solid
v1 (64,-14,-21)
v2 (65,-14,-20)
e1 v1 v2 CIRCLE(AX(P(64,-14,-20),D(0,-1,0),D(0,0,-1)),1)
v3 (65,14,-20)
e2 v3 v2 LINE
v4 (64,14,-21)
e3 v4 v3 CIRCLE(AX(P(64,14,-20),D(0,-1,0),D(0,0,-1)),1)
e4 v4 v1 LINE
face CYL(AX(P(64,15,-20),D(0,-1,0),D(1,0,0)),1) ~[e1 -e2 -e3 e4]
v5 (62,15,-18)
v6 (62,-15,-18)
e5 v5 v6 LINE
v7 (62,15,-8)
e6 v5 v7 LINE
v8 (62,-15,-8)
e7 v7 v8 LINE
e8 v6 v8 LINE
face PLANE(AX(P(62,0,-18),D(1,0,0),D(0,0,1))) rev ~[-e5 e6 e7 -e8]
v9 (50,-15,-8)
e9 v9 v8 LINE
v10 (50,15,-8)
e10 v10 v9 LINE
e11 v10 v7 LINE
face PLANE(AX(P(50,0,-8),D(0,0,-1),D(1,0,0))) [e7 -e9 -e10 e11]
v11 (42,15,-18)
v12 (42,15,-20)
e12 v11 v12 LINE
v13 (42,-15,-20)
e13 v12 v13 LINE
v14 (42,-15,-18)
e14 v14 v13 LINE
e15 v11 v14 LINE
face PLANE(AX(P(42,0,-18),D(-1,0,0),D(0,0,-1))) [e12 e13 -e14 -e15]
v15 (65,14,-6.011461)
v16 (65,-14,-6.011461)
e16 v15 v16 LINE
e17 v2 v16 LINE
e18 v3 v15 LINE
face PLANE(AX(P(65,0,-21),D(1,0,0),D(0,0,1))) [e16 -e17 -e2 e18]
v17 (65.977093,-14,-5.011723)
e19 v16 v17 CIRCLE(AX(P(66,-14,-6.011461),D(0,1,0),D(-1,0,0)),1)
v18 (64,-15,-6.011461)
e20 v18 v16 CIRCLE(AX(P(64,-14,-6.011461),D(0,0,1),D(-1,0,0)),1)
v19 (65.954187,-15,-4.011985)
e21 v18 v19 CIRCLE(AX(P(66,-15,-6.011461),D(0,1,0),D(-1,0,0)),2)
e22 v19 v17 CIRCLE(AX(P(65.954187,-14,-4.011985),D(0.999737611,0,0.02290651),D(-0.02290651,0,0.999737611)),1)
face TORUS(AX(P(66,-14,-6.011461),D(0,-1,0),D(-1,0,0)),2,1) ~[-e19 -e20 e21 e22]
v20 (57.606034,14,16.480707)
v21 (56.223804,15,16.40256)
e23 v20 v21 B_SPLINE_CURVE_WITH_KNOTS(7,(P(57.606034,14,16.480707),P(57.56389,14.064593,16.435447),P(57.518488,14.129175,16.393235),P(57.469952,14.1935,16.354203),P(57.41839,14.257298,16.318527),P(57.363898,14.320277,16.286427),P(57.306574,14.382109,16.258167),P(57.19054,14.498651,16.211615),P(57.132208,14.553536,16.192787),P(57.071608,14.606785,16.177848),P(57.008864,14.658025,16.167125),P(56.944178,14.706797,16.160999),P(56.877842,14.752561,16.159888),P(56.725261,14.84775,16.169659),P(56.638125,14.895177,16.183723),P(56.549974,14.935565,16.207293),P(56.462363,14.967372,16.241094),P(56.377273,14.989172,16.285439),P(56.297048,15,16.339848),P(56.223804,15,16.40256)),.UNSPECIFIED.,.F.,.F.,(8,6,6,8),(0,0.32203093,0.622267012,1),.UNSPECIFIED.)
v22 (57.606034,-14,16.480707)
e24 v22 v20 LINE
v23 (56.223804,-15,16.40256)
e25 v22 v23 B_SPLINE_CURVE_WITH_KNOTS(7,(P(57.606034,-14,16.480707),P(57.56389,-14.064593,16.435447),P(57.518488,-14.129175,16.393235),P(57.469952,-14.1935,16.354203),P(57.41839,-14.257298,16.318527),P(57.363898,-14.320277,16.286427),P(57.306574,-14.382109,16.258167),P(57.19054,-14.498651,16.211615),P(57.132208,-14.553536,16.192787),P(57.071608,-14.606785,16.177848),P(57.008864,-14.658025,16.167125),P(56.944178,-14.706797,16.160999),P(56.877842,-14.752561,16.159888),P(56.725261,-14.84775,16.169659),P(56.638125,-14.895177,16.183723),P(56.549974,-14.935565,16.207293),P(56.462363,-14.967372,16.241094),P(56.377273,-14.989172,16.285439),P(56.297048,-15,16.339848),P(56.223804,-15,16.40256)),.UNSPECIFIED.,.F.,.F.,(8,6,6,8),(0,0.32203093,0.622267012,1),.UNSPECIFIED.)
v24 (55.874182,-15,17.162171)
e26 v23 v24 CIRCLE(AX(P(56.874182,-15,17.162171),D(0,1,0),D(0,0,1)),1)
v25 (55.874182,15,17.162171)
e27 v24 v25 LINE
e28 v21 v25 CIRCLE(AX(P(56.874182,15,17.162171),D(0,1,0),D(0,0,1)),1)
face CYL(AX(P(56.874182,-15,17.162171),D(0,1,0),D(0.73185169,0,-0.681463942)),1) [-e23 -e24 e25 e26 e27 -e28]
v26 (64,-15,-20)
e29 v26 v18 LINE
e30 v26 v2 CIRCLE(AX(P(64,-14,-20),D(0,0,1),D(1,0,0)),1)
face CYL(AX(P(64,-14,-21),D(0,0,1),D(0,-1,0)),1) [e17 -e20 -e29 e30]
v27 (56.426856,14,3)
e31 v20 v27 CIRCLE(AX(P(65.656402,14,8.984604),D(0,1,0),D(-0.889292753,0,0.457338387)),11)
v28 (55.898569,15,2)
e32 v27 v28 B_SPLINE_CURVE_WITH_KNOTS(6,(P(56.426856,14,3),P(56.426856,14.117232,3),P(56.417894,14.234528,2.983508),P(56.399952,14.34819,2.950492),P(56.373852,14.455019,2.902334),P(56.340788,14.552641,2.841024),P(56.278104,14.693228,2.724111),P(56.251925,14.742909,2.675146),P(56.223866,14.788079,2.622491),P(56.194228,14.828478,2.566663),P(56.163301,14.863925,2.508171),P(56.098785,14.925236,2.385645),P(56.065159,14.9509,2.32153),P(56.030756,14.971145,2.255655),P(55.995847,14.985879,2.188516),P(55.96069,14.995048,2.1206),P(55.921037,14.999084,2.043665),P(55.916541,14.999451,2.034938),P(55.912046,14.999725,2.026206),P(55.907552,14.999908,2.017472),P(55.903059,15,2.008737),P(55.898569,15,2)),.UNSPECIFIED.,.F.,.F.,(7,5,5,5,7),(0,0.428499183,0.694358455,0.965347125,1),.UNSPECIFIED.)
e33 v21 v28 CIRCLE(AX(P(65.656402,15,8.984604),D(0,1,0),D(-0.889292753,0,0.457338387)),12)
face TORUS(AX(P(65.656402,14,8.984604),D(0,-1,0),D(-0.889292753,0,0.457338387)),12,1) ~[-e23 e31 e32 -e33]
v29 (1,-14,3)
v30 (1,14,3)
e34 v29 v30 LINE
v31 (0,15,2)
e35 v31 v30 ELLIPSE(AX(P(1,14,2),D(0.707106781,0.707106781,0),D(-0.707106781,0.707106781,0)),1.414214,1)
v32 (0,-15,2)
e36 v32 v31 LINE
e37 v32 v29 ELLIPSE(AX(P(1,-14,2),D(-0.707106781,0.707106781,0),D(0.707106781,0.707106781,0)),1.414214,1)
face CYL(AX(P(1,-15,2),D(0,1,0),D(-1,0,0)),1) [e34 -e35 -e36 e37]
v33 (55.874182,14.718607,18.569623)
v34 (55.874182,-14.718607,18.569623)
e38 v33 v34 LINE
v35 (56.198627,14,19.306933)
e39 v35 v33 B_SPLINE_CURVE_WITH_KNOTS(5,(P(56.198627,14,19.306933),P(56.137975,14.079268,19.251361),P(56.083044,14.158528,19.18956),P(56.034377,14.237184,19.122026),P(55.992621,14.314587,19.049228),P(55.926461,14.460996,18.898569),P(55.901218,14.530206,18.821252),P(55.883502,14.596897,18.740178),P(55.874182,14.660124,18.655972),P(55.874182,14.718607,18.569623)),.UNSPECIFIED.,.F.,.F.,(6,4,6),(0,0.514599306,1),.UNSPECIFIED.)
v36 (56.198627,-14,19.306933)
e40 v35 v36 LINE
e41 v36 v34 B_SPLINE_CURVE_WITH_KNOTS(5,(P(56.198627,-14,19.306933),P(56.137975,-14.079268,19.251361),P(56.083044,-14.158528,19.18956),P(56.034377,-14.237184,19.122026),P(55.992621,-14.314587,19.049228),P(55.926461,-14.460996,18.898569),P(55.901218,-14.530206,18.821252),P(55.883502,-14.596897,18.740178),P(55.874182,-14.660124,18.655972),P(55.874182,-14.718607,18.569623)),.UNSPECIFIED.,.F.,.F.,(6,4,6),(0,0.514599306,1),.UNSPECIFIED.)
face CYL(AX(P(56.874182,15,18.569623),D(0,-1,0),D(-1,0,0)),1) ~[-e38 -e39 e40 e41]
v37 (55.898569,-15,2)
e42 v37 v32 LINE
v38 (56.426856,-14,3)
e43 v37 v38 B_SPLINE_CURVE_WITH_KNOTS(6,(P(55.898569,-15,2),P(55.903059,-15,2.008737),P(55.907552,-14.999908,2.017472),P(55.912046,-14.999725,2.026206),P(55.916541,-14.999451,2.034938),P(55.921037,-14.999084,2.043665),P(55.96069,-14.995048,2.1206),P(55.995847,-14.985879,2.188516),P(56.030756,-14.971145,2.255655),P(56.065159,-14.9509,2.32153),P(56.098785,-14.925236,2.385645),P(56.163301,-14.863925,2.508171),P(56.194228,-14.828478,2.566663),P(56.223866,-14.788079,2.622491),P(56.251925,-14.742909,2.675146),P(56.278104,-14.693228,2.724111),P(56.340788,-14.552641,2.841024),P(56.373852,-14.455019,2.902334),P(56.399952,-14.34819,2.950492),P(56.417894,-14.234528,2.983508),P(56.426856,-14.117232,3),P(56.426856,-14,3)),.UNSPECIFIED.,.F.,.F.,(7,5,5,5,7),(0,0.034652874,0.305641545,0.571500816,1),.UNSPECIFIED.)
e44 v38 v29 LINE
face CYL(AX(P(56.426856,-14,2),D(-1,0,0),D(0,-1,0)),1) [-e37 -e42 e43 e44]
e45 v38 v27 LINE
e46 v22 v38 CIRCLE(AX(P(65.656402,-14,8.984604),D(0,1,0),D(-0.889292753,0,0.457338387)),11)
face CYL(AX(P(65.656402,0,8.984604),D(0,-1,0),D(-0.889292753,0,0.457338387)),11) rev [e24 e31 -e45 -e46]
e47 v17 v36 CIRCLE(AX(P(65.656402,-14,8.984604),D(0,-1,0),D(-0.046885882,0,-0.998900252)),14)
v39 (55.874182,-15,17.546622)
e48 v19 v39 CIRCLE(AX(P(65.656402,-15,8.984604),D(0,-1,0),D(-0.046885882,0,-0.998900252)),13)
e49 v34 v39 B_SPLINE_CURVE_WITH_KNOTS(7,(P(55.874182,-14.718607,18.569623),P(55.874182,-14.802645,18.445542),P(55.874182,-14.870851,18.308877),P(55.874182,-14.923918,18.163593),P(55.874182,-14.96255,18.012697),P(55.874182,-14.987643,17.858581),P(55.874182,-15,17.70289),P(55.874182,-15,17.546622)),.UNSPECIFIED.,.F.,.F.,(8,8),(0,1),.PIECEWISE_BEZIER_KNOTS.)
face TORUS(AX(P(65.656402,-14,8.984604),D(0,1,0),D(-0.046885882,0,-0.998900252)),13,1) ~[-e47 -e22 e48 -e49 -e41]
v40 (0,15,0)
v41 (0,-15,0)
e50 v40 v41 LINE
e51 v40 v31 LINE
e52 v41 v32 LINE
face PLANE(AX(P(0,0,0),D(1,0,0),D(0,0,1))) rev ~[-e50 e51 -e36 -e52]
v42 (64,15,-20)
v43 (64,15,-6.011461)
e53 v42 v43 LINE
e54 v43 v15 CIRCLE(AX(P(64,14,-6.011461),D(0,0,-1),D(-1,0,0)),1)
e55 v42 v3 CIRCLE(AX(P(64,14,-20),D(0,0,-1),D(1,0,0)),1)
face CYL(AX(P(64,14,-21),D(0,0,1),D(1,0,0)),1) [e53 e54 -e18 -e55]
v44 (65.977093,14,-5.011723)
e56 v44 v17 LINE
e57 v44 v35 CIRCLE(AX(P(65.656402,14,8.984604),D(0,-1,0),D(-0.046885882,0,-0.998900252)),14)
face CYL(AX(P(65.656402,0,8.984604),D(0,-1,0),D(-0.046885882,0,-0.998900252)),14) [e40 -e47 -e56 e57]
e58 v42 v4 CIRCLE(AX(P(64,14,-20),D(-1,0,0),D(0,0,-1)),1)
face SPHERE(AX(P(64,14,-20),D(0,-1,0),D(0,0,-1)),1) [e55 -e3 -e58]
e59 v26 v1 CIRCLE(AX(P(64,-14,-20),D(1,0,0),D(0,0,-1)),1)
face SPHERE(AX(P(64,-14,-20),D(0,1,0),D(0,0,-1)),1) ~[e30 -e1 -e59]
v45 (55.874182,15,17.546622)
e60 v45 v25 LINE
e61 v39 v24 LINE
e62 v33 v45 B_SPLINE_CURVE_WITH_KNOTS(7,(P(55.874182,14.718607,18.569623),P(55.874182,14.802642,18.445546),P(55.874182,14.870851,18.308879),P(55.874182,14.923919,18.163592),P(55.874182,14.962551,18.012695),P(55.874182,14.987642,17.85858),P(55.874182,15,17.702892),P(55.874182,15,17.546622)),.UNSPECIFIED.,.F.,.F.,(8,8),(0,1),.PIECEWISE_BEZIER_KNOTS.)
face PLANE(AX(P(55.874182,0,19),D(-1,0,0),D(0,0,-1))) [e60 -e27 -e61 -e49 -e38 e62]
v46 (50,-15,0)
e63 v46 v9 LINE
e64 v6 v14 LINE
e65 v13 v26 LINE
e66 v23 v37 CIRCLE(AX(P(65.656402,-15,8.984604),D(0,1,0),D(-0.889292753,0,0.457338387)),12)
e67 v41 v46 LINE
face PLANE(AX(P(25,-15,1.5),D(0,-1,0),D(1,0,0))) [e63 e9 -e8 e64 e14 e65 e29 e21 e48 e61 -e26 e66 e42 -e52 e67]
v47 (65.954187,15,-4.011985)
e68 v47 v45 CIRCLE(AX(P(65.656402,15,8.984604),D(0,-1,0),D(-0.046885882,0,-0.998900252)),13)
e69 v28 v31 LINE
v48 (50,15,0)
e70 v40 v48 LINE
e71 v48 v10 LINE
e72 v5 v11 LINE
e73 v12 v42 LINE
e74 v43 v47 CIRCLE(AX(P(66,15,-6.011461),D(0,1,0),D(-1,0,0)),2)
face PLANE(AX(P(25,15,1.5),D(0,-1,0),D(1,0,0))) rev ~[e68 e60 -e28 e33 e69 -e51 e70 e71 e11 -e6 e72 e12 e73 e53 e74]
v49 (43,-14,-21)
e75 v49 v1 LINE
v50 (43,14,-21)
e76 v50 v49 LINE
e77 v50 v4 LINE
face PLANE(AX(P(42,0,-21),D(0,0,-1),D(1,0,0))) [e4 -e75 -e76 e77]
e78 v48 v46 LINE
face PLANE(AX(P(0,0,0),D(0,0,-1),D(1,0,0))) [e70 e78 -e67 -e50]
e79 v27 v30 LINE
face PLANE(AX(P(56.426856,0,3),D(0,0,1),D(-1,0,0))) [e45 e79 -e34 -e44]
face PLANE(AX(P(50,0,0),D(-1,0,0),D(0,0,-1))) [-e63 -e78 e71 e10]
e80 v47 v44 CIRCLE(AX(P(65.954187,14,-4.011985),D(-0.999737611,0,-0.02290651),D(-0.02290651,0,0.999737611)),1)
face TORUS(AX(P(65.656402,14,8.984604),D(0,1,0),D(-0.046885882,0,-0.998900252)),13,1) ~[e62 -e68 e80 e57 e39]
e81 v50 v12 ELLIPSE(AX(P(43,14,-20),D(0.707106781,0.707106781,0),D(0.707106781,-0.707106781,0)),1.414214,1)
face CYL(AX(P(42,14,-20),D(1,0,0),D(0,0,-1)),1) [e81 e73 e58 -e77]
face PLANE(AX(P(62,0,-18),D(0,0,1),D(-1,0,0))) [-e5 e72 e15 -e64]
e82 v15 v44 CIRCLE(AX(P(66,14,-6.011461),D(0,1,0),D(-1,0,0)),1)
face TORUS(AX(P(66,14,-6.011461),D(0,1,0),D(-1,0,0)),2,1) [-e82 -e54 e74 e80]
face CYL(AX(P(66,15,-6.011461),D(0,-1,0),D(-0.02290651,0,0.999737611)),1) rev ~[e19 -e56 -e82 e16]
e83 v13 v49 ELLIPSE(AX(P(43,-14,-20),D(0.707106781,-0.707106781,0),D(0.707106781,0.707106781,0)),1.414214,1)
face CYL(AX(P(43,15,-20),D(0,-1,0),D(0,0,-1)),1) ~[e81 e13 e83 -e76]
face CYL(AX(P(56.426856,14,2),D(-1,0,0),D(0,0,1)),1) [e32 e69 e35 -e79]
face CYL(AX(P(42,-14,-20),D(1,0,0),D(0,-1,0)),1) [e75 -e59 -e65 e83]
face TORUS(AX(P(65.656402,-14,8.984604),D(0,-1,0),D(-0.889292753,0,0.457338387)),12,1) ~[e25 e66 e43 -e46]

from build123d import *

# Parameters (mm, degrees)
F0_W          = 50
F0_H          = 3
F0_W_2        = 3
F0_W_3        = 9
F0_H_2        = 10
F1_DEPTH      = 15
F1_DEPTH_BACK = 15
F2_R          = 1


with BuildPart() as f1:
    # F0 (on Front) → F1 (new body, two sides)
    with BuildSketch(Plane.XZ) as f1_sk:
        with Locations((25, 1.5)):
            Rectangle(F0_W, F0_H)
        Polygon((50, 3), (50, 0), (50, -5), (53, -5), (53, 3), align=None)
        with Locations((51.5, -6.5)):
            Rectangle(F0_W_2, F0_H)
        with BuildLine():
            ThreePointArc((65, -5), (57.8905996075, -2.6641005887), (53, 3))
            Line((53, 3), (53, -5))
            Line((53, -5), (62, -5))
            Line((62, -5), (65, -5))
        make_face()
        with BuildLine():
            Line((55.8741820756, 3), (53, 3))
            ThreePointArc((53, 3), (57.8905996075, -2.6641005887), (65, -5))
            ThreePointArc((65, -5), (78.7423188539, 13.9604240048), (55.8741820756, 19))
            Line((55.8741820756, 19), (55.8741820756, 14.0153257874))
            ThreePointArc((55.8741820756, 14.0153257874), (76.6425830118, 9.5358154417), (56.4268562898, 3))
            Line((56.4268562898, 3), (55.8741820756, 3))
        make_face()
        with Locations((57.5, -6.5)):
            Rectangle(F0_W_3, F0_H)
        with Locations((63.5, -6.5)):
            Rectangle(F0_W_2, F0_H)
        with Locations((63.5, -13)):
            Rectangle(F0_W_2, F0_H_2)
        Polygon((65, -21), (65, -18), (62, -18), (42, -18), (42, -21), align=None)
    extrude(amount=F1_DEPTH)
    extrude(f1_sk.sketch, amount=-F1_DEPTH_BACK)

    # F2
    f2_edges = [f1.edges().sort_by_distance(p)[0] for p in [
        (55.874182, 0, 14.015326),
        (65, 0, -21),
        (0, 0, 3),
        (78.742319, -15, 13.960424),
        (55.874182, 0, 19),
        (78.742319, 15, 13.960424),
        (65, 0, -5),
        (28.213428, 15, 3),
        (28.213428, -15, 3),
        (76.642583, -15, 9.535815),
        (76.642583, 15, 9.535815),
        (53.5, -15, -21),
        (53.5, 15, -21),
        (42, 0, -21),
        (65, 15, -13),
        (65, -15, -13),
    ]]
    fillet(f2_edges, radius=F2_R)


solid = f1.part
